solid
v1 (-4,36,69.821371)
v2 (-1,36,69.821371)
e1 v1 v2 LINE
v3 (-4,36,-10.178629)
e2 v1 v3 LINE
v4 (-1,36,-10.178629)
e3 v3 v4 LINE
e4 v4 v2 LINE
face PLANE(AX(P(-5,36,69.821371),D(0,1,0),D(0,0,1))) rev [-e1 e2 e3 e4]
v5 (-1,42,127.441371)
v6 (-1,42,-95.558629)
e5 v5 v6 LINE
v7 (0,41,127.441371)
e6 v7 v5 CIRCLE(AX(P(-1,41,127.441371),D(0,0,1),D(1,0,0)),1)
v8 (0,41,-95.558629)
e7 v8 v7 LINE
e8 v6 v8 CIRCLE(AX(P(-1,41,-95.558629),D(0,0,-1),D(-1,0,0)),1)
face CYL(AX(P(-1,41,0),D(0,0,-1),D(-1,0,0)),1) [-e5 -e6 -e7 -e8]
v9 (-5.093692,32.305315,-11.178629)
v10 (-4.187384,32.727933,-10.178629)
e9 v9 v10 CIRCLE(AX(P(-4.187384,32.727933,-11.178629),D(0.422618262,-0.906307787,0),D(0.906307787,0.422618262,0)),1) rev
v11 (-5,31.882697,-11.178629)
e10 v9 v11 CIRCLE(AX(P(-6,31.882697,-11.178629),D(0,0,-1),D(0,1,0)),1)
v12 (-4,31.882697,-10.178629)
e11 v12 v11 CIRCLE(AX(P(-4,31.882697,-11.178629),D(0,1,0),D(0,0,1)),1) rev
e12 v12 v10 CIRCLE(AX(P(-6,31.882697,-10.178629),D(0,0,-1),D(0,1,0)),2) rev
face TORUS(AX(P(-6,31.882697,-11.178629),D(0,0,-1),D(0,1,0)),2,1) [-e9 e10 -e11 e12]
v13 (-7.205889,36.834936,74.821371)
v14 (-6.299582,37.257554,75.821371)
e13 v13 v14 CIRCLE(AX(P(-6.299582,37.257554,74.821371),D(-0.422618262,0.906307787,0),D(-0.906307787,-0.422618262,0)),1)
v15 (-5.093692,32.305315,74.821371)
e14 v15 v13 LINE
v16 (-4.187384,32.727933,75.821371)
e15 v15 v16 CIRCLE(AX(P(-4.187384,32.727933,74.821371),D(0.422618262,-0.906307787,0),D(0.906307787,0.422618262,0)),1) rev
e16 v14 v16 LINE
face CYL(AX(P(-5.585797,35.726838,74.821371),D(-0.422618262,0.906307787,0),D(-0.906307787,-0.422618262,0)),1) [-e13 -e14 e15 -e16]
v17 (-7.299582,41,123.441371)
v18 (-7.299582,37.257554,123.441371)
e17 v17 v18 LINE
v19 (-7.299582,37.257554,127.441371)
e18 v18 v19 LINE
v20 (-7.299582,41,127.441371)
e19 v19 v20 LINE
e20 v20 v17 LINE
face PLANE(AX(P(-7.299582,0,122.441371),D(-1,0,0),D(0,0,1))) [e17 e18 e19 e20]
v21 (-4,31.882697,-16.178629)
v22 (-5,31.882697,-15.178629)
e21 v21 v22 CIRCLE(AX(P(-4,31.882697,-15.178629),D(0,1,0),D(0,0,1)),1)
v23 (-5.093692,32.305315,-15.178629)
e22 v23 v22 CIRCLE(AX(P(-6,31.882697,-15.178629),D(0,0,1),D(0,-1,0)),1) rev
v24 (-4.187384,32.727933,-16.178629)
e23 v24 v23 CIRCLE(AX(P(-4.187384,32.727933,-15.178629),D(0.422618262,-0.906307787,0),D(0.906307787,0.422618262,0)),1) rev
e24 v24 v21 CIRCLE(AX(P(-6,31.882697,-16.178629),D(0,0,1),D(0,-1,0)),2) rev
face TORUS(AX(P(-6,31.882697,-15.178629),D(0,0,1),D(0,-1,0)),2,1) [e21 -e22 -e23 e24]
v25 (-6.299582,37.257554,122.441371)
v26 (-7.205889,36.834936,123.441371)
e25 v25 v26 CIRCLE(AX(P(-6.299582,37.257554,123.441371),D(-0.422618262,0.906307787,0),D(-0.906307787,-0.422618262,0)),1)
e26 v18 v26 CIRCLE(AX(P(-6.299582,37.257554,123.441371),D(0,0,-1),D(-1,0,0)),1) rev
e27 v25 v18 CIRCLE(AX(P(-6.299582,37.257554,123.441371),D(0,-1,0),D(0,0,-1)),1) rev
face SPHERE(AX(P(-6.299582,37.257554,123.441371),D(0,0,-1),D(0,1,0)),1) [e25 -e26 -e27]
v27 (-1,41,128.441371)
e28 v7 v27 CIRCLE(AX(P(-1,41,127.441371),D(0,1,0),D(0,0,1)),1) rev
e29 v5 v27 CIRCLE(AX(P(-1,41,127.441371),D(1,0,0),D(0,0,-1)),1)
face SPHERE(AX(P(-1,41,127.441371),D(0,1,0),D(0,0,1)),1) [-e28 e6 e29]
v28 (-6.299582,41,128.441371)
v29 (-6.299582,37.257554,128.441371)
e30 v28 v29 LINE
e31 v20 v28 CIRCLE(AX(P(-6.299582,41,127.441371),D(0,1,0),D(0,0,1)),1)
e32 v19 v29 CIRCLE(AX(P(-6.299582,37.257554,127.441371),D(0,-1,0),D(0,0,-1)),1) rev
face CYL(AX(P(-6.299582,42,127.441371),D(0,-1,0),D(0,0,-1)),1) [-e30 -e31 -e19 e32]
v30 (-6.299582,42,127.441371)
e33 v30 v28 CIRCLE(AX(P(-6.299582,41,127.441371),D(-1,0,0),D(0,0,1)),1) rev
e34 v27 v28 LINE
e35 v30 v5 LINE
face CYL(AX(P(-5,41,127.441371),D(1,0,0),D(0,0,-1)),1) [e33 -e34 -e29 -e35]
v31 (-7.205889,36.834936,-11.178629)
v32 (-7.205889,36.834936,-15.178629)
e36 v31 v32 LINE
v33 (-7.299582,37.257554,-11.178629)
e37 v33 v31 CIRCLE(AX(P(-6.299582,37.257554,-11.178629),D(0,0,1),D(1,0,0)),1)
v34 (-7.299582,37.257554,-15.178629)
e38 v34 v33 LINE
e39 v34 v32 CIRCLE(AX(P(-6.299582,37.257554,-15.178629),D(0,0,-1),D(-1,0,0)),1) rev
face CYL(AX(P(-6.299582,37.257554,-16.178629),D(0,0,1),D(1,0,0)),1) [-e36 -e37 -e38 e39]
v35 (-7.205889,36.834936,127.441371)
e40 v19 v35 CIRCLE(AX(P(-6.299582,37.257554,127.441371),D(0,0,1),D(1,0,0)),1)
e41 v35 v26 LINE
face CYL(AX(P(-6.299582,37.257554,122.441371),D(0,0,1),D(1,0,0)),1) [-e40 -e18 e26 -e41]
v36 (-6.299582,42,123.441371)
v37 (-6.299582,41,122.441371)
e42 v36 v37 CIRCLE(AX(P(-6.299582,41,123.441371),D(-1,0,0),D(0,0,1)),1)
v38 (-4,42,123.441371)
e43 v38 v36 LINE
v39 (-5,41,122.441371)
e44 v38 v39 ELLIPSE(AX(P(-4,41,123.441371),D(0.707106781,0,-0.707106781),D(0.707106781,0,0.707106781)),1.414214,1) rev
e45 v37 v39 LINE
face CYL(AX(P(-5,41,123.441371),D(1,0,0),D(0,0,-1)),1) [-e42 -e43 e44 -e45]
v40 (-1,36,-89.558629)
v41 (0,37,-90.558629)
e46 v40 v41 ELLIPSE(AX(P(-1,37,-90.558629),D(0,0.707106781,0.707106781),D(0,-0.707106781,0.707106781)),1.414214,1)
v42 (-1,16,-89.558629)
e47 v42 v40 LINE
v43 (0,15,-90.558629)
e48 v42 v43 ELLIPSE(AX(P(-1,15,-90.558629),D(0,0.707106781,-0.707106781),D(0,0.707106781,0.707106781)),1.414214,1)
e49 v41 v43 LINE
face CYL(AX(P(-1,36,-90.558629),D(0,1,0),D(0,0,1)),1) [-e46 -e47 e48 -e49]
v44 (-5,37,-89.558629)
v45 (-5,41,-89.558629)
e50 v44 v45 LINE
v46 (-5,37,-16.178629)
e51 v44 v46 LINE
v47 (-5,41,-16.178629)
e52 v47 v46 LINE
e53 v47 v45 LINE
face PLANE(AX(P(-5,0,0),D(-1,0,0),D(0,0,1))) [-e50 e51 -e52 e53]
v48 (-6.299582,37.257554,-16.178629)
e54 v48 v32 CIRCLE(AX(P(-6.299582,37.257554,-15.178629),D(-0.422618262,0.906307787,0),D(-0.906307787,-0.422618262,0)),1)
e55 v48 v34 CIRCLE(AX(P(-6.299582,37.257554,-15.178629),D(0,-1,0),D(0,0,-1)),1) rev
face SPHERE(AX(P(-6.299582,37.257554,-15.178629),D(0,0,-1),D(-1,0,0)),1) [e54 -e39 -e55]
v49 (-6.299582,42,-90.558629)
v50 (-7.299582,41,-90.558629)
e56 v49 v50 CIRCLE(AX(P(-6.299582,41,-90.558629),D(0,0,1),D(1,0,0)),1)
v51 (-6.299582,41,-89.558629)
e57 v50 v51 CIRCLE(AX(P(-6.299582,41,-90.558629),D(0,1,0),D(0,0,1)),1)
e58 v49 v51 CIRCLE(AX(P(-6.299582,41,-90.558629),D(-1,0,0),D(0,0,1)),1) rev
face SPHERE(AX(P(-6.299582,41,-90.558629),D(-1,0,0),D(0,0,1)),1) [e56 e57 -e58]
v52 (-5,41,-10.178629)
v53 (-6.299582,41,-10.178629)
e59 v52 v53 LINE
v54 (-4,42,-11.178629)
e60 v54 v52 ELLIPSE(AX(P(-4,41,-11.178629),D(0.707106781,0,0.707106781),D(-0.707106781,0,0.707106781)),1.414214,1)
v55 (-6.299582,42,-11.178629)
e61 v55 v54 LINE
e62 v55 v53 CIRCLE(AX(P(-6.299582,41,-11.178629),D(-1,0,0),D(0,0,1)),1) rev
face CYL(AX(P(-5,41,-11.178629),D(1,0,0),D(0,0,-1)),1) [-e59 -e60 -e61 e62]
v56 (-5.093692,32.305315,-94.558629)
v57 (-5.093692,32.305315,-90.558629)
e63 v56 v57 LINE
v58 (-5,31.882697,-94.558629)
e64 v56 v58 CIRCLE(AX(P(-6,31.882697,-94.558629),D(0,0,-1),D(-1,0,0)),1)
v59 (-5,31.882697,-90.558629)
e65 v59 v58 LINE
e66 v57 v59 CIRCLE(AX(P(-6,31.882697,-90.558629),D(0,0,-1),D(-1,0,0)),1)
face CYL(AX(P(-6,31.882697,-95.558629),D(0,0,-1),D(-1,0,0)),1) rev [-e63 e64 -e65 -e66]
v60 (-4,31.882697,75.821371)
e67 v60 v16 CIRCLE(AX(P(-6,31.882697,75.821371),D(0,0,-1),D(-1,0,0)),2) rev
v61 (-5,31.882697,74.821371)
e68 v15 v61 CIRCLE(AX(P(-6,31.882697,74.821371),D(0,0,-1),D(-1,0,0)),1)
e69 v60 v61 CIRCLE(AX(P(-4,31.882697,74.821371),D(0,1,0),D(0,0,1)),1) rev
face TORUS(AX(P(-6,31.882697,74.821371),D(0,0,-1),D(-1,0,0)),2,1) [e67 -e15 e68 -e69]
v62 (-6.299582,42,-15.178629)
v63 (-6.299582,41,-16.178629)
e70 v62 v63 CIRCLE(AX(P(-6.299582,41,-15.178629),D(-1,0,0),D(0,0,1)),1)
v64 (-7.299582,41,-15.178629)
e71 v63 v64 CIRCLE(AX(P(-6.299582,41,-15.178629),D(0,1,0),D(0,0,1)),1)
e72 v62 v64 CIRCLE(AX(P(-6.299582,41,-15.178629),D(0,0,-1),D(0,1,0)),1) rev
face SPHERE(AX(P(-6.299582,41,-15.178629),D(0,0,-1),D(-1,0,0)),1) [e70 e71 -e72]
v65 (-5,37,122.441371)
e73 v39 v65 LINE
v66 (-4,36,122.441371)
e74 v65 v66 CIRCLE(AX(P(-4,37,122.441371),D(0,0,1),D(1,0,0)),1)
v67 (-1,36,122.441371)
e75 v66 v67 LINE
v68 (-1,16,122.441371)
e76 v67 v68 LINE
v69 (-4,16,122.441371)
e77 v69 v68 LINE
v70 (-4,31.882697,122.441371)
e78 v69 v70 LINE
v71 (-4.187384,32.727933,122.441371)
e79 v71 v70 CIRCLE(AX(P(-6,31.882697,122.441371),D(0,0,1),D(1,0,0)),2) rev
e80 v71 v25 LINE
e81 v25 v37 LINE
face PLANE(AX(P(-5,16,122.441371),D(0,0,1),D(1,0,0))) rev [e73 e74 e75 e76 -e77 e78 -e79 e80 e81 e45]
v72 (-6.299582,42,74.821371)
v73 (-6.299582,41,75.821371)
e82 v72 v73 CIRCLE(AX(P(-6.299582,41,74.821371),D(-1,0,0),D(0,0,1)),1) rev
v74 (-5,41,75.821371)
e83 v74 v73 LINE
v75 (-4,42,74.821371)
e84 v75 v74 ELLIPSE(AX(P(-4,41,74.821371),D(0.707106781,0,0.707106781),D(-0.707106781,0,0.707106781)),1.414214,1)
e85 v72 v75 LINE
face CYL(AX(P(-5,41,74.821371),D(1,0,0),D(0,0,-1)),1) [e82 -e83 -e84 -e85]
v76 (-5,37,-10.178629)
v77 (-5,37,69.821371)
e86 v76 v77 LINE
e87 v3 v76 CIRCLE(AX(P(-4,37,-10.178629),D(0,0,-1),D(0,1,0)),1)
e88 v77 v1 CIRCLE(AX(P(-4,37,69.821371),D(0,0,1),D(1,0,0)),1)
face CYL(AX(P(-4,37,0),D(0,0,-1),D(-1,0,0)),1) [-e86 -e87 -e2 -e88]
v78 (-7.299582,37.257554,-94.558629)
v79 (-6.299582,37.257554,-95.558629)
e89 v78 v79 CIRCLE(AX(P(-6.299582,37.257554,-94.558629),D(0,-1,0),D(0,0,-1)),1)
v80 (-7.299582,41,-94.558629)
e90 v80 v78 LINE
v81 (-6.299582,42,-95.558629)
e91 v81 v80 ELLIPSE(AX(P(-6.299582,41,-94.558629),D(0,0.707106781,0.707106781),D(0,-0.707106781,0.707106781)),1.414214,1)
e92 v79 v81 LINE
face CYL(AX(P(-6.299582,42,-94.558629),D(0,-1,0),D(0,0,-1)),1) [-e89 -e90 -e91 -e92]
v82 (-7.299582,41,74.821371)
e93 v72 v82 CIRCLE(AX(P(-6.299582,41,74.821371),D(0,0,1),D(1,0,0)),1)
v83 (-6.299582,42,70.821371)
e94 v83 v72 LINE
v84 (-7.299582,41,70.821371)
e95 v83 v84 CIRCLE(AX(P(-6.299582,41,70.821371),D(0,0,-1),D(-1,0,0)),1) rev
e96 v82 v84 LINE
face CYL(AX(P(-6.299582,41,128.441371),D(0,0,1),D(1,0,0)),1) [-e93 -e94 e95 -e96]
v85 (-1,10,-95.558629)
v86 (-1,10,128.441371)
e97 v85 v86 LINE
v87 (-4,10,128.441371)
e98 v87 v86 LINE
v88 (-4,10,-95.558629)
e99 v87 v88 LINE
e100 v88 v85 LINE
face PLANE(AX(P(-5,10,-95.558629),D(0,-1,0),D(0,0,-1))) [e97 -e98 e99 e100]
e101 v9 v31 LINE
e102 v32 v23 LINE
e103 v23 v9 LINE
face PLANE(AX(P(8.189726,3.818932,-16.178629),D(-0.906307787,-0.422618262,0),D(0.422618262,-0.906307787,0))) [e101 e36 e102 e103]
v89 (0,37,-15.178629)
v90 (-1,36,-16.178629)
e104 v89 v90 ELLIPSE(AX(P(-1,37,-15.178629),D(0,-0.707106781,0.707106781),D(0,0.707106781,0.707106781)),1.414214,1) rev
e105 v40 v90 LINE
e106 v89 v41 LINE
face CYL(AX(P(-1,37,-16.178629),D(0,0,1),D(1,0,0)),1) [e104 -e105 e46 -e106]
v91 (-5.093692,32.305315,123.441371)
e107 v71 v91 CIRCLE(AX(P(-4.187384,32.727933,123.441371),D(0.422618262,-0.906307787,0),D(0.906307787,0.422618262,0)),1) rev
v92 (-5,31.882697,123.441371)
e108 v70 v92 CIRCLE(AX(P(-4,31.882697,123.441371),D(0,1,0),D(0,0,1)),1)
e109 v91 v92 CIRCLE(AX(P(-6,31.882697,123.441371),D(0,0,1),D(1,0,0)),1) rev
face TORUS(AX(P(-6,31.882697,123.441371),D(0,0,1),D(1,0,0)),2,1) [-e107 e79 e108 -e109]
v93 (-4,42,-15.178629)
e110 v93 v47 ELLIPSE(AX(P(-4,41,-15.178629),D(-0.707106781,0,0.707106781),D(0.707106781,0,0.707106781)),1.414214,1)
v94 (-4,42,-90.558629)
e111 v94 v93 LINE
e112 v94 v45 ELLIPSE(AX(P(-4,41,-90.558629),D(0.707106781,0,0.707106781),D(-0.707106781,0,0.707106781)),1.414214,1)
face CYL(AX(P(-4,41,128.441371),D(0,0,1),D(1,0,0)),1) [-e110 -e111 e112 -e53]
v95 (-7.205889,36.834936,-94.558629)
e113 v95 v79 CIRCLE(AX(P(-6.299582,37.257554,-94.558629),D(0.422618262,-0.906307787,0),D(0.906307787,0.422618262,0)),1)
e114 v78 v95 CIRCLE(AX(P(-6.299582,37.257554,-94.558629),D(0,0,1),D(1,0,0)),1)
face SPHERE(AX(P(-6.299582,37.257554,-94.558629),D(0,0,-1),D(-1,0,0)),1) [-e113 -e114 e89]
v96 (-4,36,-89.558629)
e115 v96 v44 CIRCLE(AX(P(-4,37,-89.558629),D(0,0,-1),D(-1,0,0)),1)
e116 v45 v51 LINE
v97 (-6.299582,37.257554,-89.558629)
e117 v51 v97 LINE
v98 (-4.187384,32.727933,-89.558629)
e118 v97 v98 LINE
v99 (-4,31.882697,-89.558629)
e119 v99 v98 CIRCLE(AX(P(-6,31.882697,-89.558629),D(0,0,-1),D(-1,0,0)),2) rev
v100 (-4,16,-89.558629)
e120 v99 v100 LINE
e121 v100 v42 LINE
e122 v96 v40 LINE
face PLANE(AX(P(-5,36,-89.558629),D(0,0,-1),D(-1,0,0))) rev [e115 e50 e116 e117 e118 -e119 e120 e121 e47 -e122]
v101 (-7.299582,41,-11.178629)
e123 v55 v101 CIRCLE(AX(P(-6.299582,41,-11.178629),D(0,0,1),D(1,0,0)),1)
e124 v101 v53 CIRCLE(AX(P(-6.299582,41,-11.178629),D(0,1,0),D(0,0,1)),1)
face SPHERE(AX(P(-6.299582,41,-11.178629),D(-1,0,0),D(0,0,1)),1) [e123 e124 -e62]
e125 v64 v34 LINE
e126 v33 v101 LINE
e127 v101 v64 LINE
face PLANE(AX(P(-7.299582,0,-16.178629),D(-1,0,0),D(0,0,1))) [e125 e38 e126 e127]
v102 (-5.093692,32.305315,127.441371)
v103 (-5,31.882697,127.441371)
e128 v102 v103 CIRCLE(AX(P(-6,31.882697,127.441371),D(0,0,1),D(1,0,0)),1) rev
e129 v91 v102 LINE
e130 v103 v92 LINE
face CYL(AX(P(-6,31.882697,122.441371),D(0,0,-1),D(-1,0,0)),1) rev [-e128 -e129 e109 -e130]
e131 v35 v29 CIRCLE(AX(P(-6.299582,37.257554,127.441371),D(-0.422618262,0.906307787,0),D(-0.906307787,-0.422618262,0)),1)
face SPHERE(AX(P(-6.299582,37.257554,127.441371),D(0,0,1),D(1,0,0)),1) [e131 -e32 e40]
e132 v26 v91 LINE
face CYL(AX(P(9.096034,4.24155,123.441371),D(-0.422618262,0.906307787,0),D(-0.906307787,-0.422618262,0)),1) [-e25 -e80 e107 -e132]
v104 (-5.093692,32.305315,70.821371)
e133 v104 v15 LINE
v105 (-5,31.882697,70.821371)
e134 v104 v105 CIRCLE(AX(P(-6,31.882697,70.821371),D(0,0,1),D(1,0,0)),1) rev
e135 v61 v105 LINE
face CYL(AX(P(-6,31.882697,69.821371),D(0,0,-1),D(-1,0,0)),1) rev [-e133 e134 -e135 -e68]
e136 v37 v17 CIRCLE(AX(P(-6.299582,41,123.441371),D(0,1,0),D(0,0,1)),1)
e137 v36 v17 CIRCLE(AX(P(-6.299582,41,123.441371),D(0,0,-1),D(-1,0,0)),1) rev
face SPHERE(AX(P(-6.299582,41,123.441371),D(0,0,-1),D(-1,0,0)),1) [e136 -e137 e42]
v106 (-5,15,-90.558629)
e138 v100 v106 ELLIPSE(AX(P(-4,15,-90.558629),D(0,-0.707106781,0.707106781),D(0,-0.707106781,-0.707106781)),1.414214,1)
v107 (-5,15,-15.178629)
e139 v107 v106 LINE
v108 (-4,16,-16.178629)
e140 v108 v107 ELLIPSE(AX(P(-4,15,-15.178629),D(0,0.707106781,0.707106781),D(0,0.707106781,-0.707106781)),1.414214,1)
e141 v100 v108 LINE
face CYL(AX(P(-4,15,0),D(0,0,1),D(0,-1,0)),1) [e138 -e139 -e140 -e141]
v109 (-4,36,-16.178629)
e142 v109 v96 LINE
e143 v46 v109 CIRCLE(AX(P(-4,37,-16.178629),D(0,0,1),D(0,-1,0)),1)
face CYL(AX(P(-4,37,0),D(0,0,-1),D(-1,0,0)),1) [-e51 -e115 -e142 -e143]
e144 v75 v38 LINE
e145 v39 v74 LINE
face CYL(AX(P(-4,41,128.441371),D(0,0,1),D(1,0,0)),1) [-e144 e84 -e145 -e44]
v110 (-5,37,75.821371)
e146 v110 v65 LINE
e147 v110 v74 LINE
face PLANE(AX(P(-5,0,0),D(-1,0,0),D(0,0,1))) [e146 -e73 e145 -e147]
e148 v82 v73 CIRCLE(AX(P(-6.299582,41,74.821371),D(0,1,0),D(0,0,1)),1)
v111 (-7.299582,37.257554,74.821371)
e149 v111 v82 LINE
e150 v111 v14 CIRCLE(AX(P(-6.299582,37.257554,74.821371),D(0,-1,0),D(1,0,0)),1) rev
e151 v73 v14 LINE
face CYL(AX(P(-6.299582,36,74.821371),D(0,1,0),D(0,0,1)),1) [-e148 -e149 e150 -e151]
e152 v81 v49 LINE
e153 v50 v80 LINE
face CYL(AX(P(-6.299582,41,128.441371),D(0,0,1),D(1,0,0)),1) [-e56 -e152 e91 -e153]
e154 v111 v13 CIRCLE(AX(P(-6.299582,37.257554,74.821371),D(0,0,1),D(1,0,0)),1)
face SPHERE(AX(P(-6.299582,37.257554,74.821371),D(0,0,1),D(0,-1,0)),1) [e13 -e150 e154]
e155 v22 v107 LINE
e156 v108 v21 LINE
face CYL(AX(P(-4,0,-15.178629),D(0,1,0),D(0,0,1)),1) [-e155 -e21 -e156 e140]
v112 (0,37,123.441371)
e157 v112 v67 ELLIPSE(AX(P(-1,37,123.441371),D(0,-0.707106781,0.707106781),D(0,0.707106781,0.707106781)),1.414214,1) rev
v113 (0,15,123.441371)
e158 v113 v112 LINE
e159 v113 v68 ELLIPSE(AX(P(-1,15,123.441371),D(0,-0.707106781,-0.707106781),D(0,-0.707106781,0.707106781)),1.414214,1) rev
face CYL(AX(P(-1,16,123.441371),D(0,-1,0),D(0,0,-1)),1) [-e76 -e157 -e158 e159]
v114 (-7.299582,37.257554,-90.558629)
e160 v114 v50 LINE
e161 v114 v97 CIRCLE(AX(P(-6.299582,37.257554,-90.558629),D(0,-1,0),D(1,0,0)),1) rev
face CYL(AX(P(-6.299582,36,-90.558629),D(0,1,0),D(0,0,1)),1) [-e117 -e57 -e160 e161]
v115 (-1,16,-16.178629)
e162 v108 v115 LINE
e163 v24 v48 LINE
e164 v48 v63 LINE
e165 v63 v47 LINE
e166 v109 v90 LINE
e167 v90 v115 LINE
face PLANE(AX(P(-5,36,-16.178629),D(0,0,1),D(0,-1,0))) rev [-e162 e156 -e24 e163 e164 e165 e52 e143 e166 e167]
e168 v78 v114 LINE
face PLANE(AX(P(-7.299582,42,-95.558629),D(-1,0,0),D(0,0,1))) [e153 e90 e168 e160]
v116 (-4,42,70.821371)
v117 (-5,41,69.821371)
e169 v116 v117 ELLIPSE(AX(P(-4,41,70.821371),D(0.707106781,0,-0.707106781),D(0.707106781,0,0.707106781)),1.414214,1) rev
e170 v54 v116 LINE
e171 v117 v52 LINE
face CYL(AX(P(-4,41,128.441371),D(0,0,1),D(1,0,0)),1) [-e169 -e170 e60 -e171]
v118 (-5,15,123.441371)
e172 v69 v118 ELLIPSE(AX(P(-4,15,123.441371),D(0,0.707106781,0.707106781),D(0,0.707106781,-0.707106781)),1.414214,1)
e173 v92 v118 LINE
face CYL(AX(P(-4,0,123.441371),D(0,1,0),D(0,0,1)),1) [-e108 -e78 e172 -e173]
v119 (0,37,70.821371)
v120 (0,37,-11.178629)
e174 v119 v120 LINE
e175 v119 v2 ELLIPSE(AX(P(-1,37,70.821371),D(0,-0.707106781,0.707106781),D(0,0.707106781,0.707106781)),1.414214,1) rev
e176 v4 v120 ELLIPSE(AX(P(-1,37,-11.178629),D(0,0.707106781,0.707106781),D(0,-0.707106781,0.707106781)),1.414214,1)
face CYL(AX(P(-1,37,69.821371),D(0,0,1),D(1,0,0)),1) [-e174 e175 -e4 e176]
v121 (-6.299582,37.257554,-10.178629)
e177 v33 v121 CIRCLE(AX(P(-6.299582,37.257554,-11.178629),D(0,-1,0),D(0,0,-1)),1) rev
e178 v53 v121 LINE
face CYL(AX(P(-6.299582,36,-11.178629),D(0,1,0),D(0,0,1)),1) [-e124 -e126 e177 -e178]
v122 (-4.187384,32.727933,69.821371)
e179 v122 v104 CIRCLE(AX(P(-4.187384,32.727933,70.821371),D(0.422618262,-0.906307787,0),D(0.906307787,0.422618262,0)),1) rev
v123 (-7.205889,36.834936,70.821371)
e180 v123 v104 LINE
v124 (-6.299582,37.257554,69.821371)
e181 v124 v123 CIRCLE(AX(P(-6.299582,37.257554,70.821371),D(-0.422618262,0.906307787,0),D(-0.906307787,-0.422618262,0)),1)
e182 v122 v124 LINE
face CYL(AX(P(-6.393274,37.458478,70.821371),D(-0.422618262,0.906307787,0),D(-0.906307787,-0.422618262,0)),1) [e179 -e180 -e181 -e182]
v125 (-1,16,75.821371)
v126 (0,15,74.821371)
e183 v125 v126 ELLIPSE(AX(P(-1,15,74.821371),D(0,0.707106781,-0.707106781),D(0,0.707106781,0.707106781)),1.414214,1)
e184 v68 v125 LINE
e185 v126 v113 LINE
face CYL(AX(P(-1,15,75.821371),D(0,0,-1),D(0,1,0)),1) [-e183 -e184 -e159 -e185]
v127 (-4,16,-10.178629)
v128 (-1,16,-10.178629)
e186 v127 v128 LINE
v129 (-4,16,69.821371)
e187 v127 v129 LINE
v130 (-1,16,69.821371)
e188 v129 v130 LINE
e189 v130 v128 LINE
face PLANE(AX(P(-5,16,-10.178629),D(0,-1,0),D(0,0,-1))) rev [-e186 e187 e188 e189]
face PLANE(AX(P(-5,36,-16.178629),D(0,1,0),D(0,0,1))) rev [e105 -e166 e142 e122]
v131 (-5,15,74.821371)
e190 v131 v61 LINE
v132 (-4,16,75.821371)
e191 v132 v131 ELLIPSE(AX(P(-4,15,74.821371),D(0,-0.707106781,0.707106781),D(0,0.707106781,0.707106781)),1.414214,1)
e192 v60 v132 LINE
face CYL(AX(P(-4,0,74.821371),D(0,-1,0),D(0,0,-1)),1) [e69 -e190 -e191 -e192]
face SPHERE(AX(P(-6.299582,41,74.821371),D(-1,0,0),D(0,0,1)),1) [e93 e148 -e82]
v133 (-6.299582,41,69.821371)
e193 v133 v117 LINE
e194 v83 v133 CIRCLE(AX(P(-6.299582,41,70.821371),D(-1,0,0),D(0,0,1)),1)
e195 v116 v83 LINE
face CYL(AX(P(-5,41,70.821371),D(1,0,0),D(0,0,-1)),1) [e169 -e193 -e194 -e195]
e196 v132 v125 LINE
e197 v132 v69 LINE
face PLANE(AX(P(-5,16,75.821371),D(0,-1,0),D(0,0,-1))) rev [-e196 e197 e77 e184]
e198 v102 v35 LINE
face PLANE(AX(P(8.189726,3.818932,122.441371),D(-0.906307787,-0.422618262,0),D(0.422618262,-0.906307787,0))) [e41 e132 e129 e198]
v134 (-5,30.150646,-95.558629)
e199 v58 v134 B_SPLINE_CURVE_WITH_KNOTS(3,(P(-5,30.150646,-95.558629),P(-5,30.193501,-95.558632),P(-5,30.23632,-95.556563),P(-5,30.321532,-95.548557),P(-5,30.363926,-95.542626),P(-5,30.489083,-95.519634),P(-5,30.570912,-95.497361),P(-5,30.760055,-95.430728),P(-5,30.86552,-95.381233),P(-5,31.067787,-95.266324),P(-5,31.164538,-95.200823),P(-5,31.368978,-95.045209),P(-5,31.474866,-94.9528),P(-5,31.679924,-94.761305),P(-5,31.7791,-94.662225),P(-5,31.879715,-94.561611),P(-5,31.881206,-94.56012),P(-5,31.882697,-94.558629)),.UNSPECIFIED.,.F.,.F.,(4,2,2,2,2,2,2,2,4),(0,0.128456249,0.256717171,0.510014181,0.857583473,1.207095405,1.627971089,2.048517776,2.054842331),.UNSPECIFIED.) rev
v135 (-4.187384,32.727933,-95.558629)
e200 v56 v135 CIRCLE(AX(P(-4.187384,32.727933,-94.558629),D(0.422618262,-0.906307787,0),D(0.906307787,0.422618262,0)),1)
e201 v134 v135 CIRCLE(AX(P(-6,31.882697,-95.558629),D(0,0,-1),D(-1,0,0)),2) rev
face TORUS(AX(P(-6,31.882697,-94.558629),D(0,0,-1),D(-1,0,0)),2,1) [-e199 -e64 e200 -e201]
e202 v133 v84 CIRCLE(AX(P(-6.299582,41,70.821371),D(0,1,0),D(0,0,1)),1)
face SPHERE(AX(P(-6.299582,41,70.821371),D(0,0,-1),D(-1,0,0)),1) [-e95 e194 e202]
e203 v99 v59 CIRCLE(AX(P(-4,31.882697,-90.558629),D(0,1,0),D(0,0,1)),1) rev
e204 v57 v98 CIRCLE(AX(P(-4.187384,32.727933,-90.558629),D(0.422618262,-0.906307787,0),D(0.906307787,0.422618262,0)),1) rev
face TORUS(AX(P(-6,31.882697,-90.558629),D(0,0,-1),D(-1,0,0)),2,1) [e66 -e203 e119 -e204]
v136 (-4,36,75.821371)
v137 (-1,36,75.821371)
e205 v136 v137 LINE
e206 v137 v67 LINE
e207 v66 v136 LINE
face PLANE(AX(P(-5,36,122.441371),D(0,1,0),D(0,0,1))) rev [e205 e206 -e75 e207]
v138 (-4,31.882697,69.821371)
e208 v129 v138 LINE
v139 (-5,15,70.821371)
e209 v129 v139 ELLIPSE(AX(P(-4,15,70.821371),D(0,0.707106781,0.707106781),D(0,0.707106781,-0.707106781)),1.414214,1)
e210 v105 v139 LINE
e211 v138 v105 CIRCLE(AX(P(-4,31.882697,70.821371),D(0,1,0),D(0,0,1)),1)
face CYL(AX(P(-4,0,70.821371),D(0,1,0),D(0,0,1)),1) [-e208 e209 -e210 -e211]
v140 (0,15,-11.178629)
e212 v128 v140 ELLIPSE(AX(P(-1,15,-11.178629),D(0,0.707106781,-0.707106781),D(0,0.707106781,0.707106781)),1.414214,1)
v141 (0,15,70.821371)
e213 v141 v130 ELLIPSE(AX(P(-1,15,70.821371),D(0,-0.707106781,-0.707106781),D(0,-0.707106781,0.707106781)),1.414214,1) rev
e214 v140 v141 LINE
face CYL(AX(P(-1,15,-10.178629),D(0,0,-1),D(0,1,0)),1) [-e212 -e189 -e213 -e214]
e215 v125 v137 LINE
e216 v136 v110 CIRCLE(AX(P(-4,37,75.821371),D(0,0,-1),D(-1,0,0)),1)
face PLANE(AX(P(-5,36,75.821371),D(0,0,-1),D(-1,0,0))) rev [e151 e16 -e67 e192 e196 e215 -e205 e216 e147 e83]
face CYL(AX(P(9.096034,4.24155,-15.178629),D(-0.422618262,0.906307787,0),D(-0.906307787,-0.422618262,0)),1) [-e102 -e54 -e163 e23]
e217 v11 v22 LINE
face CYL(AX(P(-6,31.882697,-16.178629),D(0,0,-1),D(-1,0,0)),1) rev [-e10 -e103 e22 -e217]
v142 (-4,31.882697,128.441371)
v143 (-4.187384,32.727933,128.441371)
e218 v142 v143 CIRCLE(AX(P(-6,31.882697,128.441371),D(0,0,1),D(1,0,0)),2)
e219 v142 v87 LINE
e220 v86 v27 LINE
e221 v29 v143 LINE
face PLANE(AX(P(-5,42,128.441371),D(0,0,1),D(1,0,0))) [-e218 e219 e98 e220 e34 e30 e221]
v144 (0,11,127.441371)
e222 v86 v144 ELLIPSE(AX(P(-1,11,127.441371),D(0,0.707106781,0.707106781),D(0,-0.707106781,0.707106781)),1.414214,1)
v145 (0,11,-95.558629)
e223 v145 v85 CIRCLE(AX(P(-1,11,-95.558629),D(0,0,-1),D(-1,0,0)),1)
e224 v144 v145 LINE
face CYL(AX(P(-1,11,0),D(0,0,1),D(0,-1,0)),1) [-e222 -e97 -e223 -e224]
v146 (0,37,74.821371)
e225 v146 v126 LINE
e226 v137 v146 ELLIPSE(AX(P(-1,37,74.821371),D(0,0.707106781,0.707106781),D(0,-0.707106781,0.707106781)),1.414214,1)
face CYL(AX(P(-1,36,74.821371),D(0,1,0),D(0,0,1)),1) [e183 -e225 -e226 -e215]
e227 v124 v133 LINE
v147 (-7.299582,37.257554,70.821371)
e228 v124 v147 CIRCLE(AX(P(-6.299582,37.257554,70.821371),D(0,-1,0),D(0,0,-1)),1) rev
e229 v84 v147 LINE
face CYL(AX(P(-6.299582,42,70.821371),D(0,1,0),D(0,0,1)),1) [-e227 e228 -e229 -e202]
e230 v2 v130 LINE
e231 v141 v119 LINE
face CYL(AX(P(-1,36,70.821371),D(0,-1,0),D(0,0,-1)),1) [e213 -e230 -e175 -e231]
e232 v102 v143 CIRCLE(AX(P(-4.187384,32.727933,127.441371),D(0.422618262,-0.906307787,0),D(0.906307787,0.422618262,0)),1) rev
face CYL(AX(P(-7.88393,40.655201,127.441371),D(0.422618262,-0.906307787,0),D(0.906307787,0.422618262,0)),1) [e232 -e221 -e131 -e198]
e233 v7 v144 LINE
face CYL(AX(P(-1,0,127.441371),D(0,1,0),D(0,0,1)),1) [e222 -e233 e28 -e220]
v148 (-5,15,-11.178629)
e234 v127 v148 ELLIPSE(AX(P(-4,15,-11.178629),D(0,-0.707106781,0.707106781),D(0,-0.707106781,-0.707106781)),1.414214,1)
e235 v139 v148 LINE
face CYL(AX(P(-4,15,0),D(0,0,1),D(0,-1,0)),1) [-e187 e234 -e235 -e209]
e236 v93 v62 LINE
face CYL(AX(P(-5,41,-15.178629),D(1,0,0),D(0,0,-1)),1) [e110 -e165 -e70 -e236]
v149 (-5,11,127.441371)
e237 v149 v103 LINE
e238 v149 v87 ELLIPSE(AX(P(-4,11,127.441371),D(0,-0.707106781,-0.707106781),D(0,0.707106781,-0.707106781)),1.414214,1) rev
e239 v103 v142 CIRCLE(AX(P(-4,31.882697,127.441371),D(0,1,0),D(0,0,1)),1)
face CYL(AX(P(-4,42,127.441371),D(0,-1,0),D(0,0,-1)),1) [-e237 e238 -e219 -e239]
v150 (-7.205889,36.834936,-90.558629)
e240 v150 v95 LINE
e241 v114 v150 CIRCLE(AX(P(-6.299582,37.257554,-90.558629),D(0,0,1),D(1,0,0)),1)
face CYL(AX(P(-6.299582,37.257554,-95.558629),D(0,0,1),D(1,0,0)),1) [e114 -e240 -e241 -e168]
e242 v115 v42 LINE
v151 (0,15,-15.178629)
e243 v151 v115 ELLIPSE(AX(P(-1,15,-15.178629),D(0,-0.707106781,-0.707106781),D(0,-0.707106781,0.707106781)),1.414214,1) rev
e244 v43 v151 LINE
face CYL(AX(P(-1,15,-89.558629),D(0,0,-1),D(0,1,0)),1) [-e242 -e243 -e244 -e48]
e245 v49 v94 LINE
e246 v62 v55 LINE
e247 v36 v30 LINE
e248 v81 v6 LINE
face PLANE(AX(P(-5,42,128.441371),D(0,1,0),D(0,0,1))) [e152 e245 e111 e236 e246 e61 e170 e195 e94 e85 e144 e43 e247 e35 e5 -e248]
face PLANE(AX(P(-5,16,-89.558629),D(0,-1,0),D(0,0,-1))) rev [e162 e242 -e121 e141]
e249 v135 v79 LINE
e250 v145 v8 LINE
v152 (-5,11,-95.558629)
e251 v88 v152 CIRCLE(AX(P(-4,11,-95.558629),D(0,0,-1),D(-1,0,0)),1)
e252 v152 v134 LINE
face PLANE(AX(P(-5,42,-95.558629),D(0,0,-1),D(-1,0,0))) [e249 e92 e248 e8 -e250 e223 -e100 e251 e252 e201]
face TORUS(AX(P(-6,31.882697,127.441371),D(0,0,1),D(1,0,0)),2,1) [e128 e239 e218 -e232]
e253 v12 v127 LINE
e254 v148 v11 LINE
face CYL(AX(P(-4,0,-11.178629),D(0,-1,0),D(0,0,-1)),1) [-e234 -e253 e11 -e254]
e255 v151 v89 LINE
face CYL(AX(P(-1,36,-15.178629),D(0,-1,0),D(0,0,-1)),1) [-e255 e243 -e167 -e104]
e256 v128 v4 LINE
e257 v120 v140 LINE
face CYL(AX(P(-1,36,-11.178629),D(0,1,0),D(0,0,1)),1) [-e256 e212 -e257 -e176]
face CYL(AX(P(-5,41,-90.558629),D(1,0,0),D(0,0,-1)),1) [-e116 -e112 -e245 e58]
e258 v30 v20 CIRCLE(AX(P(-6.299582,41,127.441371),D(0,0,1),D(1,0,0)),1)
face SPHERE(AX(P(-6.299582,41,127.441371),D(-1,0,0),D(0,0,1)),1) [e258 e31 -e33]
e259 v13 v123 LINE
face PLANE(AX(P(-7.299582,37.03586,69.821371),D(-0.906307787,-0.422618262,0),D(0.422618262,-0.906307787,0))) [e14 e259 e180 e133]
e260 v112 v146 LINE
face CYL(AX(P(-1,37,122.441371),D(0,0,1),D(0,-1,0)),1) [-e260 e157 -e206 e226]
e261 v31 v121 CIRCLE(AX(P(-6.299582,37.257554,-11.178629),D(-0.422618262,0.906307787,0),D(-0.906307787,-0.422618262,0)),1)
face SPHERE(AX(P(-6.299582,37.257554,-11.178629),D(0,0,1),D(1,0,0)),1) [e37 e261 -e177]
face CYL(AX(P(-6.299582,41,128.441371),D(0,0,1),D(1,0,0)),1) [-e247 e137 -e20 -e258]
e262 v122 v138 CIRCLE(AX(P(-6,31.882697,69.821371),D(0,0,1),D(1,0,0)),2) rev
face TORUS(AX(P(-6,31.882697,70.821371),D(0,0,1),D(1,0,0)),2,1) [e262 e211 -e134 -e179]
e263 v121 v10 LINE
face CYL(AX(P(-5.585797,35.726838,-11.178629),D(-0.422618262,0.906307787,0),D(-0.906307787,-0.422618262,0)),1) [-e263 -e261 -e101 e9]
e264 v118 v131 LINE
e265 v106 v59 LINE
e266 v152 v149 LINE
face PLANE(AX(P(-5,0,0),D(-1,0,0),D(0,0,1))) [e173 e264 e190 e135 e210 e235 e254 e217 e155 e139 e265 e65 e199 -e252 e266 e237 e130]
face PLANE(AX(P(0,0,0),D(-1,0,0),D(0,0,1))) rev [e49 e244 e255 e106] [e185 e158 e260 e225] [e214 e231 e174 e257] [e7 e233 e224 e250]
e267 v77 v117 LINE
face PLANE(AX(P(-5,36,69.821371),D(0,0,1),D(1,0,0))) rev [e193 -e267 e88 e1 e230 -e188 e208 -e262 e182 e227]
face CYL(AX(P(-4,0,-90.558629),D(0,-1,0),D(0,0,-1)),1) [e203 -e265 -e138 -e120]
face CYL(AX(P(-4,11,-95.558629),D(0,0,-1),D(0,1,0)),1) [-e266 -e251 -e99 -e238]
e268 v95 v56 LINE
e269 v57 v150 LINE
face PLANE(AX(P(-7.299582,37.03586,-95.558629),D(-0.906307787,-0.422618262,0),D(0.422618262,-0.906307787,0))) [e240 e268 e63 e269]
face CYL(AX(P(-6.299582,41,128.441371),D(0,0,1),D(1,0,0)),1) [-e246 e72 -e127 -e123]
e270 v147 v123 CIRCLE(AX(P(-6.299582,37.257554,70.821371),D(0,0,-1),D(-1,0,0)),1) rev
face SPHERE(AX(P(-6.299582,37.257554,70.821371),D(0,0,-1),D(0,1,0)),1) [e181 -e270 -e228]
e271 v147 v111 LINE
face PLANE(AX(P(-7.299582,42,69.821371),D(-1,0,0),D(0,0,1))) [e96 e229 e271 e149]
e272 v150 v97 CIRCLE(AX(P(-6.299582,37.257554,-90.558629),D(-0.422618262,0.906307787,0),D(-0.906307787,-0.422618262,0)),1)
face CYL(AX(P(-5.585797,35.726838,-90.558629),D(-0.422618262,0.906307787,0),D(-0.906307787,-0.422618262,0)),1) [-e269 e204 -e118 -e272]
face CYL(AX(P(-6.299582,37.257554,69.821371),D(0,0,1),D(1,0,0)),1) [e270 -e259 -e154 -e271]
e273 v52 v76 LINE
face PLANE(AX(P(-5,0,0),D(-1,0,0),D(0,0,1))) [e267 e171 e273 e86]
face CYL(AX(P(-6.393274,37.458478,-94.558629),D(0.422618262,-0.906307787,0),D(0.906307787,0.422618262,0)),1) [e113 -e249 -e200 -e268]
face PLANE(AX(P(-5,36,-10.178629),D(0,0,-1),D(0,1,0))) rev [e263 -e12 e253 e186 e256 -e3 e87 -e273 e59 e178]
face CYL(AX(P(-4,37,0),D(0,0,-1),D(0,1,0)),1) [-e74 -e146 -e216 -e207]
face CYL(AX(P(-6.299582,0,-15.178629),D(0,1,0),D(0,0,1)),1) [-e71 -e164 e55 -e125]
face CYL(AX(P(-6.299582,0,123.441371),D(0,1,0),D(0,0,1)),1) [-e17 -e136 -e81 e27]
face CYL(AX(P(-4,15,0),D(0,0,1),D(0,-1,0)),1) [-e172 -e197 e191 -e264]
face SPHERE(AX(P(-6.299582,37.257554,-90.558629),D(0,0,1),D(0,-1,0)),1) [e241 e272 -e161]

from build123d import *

# Parameters (mm, degrees)
ESBO_O8_W                = 80
ESBO_O8_H                = 20
ESBO_O8_W_2              = 73.38
ESBO_O8_W_3              = 46.62
RESSALTO_EXTRUS_O1_DEPTH = 5
RESSALTO_EXTRUS_O2_DEPTH = 6
RESSALTO_EXTRUS_O3_DEPTH = 6
RESSALTO_EXTRUS_O4_DEPTH = 6
RESSALTO_EXTRUS_O5_DEPTH = 6
FILETE1_R                = 1
FILETE2_R                = 1


with BuildPart() as part:
    # Esboço8 → Ressalto-extrusão1 (new body)
    with BuildSketch(Plane(origin=(0, 0, 0), x_dir=(0, 0, -1), z_dir=(1, 0, 0))):
        Polygon((95.558629268, 10), (-128.441370732, 10), (-128.441370732, 42), (70.171505342, 42), (95.558629268, 42), align=None)
        with Locations((-29.821370732, 26)):
            Rectangle(ESBO_O8_W, ESBO_O8_H, mode=Mode.SUBTRACT)
        with Locations((52.868629268, 26)):
            Rectangle(ESBO_O8_W_2, ESBO_O8_H, mode=Mode.SUBTRACT)
        with Locations((-99.131370732, 26)):
            Rectangle(ESBO_O8_W_3, ESBO_O8_H, mode=Mode.SUBTRACT)
    extrude(amount=-RESSALTO_EXTRUS_O1_DEPTH)

    # Esboço9 → Ressalto-extrusão2 (add)
    with BuildSketch(Plane.XY.offset(75.821370732)):
        Polygon((-7.299581581, 42), (-5, 42), (-5, 32.104391167), (-7.299581581, 37.035859781), align=None)
    extrude(amount=-RESSALTO_EXTRUS_O2_DEPTH)

    # Esboço10 → Ressalto-extrusão3 (add)
    with BuildSketch(Plane.XY.offset(-10.178629268)):
        Polygon((-5, 32.104391167), (-5, 36), (-5, 42), (-7.299581581, 42), (-7.299581581, 37.035859781), align=None)
    extrude(amount=-RESSALTO_EXTRUS_O3_DEPTH)

    # Esboço11 → Ressalto-extrusão4 (add)
    with BuildSketch(Plane.XY.offset(128.441370732)):
        Polygon((-5, 32.104391167), (-5, 36), (-5, 42), (-7.299581581, 42), (-7.299581581, 37.035859781), align=None)
    extrude(amount=-RESSALTO_EXTRUS_O4_DEPTH)

    # Esboço12 → Ressalto-extrusão5 (add)
    with BuildSketch(Plane.XY.offset(-89.558629268)):
        Polygon((-7.299581581, 42), (-7.299581581, 37.035859781), (-5, 32.104391167), (-5, 42), align=None)
    extrude(amount=-RESSALTO_EXTRUS_O5_DEPTH)

    # Filete1
    filete1_edges = [part.edges().sort_by_distance(p)[0] for p in [
        (-6.14979079, 34.570125474, 75.821370732),
        (-6.14979079, 34.570125474, 69.821370732),
        (-7.299581581, 37.035859781, 72.821370732),
        (-7.299581581, 39.51792989, 75.821370732),
        (-7.299581581, 39.51792989, 69.821370732),
        (-7.299581581, 37.035859781, 125.441370732),
        (-7.299581581, 37.035859781, -13.178629268),
        (-3.64979079, 42, 128.441370732),
        (-7.299581581, 42, 125.441370732),
        (-6.14979079, 42, 122.441370732),
        (-5, 42, 99.131370732),
        (-6.14979079, 42, 75.821370732),
        (-7.299581581, 42, 72.821370732),
        (-6.14979079, 42, 69.821370732),
        (-5, 42, 29.821370732),
        (-6.14979079, 42, -10.178629268),
        (-7.299581581, 42, -13.178629268),
        (-6.14979079, 42, -16.178629268),
        (-5, 42, -52.868629268),
        (-6.14979079, 42, -89.558629268),
        (0, 10, 16.441370732),
        (0, 26, 128.441370732),
        (0, 42, 16.441370732),
        (0, 26, -16.178629268),
        (0, 16, -52.868629268),
        (0, 26, -89.558629268),
        (0, 36, -52.868629268),
        (0, 26, 75.821370732),
        (0, 36, 99.131370732),
        (0, 26, 122.441370732),
        (0, 16, 99.131370732),
        (0, 36, 29.821370732),
        (0, 26, 69.821370732),
        (0, 16, 29.821370732),
        (0, 26, -10.178629268),
        (-5, 24.052195584, -89.558629268),
        (-5, 16, -52.868629268),
        (-5, 24.052195584, -16.178629268),
        (-5, 32.104391167, -13.178629268),
        (-5, 24.052195584, -10.178629268),
        (-5, 16, 29.821370732),
        (-5, 24.052195584, 69.821370732),
        (-5, 32.104391167, 72.821370732),
        (-5, 24.052195584, 75.821370732),
        (-5, 16, 99.131370732),
        (-5, 24.052195584, 122.441370732),
        (-5, 32.104391167, 125.441370732),
        (-5, 21.052195584, 128.441370732),
        (-5, 10, 16.441370732),
        (-5, 36, -52.868629268),
        (-5, 36, 29.821370732),
        (-5, 36, 99.131370732),
        (-6.14979079, 34.570125474, -89.558629268),
        (-6.14979079, 34.570125474, 128.441370732),
        (-6.14979079, 34.570125474, 122.441370732),
        (-6.14979079, 34.570125474, -10.178629268),
        (-6.14979079, 34.570125474, -16.178629268),
        (-7.299581581, 39.51792989, 128.441370732),
        (-7.299581581, 39.51792989, 122.441370732),
        (-7.299581581, 39.51792989, -10.178629268),
        (-7.299581581, 39.51792989, -16.178629268),
        (-7.299581581, 42, -92.558629268),
        (-5, 32.104391167, -92.558629268),
        (-7.299581581, 37.035859781, -92.558629268),
        (-7.299581581, 39.51792989, -89.558629268),
    ]]
    fillet(filete1_edges, radius=FILETE1_R)

    # Filete2
    # the kernel refuses this fillet: 1 mm, written as the material it takes off along each edge
    with BuildSketch(Plane(origin=(-6, 31.882696504, -95.558629268), x_dir=(-0.80118997671776, -0.5984100777953153, 0), z_dir=(-0.5984100777953153, 0.80118997671776, 0))) as filete2_piece_1:
        with BuildLine():
            CenterArc((1 + FILETE2_R, FILETE2_R), FILETE2_R, 180, 90)
            Line((1, FILETE2_R), (1, 0))
            Line((1, 0), (1 + FILETE2_R, 0))
        make_face()
    revolve(axis=Axis((-6, 31.882696504, -95.558629268), (0, 0, 1)), revolution_arc=168.243887481, mode=Mode.SUBTRACT)
    with BuildSketch(Plane(origin=(-6.299581581, 37.257554444, -95.558629268), x_dir=(-1, 0, 0), z_dir=(0, 1, 0))) as filete2_piece_2:
        with BuildLine():
            CenterArc((1 - FILETE2_R, FILETE2_R), FILETE2_R, 270, 90)
            Line((1, FILETE2_R), (1, 0))
            Line((1, 0), (1 - FILETE2_R, 0))
        make_face()
    revolve(axis=Axis((-6.299581581, 37.257554444, -95.558629268), (0, 0, 1)), revolution_arc=25, mode=Mode.SUBTRACT)
    with BuildSketch(Plane(origin=(-7.205889368, 36.834936182, -95.558629268), x_dir=(0.9063077870366507, 0.4226182617406979, 0), z_dir=(0.42261826174069794, -0.9063077870366507, 0))) as filete2_piece_3:
        with BuildLine():
            CenterArc((FILETE2_R, FILETE2_R), FILETE2_R, 180, 90)
            Line((0, FILETE2_R), (0, 0))
            Line((0, 0), (FILETE2_R, 0))
        make_face()
    extrude(amount=4.997884251, mode=Mode.SUBTRACT)
    with BuildSketch(Plane(origin=(-7.299581581, 43.5, -95.558629268), x_dir=(1, 0, 0), z_dir=(0, -1, 0))) as filete2_piece_4:
        with BuildLine():
            CenterArc((FILETE2_R, FILETE2_R), FILETE2_R, 180, 90)
            Line((0, FILETE2_R), (0, 0))
            Line((0, 0), (FILETE2_R, 0))
        make_face()
    extrude(amount=6.242445556, mode=Mode.SUBTRACT)


solid = part.part
